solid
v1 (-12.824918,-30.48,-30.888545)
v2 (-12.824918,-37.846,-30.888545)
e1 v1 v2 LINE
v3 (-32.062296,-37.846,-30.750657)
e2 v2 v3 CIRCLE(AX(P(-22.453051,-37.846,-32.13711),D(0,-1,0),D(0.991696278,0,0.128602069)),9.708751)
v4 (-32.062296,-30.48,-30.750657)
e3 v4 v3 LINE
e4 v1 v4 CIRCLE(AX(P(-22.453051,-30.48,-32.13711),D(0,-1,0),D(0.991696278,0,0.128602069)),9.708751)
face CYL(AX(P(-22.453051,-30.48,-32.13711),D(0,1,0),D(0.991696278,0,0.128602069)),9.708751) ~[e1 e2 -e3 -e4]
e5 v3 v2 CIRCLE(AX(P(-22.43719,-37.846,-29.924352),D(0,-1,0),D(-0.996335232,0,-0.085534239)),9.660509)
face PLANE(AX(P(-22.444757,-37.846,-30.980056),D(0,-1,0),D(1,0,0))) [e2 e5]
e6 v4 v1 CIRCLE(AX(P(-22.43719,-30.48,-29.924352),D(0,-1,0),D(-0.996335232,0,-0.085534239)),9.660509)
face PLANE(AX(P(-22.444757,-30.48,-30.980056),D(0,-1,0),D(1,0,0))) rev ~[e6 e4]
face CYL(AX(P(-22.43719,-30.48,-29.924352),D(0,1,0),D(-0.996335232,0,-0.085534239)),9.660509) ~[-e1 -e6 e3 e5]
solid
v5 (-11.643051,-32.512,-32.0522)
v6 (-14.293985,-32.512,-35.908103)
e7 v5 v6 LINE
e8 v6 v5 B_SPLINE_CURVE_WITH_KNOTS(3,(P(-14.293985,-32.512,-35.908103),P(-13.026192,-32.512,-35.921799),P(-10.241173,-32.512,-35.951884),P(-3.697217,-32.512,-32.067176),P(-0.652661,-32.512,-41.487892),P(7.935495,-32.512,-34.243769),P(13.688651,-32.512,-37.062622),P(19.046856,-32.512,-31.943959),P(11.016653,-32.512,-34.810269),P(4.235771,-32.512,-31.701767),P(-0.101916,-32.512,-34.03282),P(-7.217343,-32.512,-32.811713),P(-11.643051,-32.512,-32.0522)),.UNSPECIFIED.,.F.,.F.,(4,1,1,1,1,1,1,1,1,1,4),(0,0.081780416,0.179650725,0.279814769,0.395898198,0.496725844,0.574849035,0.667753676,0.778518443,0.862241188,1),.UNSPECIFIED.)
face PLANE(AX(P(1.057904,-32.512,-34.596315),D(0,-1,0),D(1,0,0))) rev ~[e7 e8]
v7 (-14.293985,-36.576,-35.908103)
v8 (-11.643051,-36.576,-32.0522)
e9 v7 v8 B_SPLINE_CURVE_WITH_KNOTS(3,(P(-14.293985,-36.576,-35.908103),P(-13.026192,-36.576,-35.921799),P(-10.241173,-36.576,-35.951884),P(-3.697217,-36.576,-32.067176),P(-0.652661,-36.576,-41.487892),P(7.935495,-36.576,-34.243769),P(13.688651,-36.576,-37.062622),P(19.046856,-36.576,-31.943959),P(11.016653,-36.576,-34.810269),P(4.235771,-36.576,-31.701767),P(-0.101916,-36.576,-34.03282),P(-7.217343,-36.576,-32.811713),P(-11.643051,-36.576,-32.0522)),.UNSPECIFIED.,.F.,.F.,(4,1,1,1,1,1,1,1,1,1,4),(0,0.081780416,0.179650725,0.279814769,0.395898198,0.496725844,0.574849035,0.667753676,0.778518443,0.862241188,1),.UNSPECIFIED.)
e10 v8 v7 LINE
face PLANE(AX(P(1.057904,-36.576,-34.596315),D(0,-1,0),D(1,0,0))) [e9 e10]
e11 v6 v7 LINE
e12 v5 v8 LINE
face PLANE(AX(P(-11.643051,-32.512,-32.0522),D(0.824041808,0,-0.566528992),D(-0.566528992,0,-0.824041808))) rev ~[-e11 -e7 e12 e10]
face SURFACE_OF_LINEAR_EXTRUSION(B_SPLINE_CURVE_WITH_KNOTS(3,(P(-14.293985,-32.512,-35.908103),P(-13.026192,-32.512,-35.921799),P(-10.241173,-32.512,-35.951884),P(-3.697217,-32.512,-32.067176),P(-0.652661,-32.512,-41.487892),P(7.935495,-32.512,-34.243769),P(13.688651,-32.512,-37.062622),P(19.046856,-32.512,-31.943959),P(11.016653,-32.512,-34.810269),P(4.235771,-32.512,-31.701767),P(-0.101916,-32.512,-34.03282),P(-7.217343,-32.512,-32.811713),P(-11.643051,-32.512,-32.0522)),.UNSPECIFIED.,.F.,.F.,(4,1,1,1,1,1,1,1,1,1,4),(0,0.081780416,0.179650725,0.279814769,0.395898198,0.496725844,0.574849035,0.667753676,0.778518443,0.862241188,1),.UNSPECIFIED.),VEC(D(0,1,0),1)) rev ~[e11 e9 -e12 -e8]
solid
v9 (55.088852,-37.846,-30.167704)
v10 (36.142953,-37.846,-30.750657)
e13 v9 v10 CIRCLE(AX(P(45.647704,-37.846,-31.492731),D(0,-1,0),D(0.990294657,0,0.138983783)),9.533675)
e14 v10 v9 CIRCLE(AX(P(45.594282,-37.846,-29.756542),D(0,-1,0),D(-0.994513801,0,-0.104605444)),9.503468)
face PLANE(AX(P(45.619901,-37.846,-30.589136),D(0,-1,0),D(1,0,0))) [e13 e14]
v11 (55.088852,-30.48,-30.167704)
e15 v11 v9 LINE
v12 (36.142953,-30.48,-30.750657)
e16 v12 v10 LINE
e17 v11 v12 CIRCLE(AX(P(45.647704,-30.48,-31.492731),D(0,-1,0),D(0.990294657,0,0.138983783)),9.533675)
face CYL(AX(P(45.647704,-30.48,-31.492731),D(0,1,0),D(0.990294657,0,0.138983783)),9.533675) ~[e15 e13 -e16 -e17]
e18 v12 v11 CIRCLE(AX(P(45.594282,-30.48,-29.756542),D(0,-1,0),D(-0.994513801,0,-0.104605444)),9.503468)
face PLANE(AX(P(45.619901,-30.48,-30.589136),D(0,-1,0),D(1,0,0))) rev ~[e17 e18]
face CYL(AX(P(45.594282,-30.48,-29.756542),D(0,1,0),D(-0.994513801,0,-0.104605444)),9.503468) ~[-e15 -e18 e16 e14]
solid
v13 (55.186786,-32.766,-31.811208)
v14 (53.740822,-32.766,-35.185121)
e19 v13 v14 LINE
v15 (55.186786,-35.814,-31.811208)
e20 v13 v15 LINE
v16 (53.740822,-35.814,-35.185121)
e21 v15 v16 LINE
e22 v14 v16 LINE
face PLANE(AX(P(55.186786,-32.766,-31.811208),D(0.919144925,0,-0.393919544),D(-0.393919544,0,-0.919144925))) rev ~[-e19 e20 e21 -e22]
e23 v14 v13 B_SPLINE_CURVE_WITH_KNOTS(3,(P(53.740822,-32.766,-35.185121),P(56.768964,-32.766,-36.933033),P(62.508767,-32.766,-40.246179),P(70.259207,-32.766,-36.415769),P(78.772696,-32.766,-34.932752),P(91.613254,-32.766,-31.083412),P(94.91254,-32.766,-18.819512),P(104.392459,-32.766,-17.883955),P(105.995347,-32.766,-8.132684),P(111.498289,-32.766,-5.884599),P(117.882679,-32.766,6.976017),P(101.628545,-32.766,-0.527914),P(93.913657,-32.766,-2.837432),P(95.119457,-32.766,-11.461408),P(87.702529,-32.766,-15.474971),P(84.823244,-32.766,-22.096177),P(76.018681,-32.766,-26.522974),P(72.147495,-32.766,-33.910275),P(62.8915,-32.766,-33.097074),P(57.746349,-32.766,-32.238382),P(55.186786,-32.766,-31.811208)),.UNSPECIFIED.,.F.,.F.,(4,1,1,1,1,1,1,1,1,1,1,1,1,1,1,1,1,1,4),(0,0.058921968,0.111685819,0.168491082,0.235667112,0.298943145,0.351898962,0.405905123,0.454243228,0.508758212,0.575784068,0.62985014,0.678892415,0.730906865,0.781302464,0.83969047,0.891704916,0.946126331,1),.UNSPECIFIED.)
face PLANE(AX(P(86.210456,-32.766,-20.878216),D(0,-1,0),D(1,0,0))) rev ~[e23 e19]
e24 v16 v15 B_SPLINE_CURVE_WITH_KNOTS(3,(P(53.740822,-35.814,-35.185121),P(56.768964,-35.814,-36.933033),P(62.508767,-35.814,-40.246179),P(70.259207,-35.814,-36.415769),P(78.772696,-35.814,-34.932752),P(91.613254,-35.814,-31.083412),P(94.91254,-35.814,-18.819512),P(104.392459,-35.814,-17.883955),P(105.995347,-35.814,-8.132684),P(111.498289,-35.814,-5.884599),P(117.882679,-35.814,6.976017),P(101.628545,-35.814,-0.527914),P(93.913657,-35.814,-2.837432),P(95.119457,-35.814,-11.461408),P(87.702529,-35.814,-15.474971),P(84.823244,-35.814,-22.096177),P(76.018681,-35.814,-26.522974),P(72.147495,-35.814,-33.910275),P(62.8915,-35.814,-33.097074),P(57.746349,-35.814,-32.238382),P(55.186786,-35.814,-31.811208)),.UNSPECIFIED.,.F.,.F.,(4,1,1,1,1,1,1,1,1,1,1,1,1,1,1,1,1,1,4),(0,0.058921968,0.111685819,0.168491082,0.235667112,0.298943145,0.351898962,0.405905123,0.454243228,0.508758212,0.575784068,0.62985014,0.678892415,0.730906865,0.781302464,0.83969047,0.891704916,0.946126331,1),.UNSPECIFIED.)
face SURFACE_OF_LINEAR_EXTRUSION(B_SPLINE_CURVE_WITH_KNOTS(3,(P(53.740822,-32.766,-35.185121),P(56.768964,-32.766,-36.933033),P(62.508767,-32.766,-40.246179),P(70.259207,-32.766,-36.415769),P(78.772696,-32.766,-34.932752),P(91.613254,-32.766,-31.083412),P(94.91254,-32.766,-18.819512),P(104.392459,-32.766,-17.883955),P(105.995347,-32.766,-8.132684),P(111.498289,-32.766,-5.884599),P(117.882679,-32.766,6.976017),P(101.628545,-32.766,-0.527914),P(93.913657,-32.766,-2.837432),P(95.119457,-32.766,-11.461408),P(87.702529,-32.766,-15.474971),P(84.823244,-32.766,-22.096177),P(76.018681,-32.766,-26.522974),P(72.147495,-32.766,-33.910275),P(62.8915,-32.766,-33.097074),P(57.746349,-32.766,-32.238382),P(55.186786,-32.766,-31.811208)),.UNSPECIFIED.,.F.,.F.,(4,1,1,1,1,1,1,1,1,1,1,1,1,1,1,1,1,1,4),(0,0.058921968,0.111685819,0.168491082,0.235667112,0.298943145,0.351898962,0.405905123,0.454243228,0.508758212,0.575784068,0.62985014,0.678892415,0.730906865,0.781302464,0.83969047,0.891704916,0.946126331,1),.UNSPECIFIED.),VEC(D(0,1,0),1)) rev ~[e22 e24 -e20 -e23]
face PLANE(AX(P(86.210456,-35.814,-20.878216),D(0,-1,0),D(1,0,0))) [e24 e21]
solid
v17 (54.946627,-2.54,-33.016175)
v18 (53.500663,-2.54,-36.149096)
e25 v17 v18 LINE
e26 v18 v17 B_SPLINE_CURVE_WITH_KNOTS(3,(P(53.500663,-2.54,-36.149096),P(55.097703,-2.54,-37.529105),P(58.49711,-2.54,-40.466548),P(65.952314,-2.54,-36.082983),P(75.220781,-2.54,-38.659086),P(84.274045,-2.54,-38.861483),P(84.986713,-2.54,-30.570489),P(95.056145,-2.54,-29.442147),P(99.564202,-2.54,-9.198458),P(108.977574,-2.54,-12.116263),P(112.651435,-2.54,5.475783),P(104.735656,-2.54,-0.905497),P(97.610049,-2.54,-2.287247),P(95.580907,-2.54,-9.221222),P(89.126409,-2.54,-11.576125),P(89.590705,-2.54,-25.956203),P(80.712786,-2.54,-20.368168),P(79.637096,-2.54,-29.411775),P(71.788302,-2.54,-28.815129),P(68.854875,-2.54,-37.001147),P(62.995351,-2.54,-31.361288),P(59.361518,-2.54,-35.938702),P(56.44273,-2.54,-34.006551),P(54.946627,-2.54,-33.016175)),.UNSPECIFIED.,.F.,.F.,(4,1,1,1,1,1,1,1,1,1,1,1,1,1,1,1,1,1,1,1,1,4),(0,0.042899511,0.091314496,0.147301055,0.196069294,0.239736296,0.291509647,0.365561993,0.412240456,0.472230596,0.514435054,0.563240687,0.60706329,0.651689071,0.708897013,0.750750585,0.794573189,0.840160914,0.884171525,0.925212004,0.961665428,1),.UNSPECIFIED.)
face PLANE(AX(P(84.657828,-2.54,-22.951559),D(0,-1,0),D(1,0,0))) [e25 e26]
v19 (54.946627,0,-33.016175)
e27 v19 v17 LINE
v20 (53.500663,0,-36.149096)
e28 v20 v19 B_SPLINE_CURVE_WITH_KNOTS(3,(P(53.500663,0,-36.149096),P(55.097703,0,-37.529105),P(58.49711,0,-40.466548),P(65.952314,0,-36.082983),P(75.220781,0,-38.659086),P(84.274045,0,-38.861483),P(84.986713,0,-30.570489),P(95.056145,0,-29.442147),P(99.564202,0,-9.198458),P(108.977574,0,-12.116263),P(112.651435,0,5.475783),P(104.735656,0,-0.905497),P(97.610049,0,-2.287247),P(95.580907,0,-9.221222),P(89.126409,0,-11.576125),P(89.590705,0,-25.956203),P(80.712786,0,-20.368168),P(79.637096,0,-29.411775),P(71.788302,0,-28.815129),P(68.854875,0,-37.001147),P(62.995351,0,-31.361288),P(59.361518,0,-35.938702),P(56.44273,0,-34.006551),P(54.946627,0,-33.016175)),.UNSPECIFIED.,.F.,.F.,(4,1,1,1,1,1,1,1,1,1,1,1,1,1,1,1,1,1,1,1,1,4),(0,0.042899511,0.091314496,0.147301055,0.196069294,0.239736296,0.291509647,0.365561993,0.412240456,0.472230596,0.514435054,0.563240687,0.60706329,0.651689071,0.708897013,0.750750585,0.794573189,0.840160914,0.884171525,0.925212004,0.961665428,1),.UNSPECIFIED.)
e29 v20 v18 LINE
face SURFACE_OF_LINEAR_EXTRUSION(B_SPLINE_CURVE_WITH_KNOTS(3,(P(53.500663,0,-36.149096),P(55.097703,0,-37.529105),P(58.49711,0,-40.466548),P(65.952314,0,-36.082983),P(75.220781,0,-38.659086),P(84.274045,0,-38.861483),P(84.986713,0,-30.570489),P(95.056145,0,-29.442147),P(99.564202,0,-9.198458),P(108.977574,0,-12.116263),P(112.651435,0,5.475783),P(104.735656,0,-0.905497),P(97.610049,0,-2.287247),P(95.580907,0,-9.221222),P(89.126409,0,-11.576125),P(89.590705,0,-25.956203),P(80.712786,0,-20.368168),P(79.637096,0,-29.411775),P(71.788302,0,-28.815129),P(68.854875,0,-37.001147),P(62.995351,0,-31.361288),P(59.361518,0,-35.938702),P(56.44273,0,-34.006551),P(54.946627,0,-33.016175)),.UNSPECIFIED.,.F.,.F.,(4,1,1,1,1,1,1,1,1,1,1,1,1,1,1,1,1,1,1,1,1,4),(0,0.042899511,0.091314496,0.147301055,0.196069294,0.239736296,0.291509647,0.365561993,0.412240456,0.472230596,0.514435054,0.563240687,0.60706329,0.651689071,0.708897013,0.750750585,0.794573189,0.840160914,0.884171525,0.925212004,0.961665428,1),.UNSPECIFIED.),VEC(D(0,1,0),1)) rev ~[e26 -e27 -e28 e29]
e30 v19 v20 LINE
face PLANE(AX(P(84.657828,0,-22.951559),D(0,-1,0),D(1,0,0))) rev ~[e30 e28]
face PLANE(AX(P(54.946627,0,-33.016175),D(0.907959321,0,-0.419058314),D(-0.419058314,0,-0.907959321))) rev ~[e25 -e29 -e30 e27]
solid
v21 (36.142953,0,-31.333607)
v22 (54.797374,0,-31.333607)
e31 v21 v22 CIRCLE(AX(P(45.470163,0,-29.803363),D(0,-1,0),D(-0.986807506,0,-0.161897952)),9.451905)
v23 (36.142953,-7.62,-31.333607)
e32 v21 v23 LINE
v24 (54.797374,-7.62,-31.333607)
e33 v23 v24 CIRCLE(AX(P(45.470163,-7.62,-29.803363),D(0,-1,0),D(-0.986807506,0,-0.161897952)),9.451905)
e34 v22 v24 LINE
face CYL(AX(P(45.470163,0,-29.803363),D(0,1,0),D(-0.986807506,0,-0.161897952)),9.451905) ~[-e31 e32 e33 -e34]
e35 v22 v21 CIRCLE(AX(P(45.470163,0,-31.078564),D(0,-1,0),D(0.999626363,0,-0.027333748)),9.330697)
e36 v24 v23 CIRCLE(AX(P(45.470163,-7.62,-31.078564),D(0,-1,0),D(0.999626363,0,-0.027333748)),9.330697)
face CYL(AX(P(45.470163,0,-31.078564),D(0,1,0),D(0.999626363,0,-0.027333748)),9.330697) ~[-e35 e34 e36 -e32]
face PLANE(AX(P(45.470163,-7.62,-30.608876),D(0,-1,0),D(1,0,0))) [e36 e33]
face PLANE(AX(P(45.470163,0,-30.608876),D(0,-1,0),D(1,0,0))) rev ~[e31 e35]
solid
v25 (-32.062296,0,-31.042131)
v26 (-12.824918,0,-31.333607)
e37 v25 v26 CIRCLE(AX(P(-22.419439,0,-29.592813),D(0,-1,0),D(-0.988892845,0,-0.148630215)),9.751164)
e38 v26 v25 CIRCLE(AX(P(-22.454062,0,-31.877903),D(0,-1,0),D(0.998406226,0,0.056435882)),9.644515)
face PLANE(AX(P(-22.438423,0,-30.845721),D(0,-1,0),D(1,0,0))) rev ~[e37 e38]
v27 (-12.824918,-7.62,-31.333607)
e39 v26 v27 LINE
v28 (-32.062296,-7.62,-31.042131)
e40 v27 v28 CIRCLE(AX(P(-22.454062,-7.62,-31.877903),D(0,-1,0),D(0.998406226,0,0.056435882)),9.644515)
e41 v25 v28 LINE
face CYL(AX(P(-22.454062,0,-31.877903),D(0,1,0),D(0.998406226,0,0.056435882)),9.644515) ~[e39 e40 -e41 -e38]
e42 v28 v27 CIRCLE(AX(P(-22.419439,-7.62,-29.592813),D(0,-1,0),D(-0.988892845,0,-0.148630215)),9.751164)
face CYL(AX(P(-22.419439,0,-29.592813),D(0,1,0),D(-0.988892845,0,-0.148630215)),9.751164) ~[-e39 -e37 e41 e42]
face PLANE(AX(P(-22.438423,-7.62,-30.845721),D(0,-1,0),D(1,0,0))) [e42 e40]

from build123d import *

# Parameters (mm, degrees)
F3_DEPTH  = 7.62
F5_START  = 30.48
F5_DEPTH  = 7.366
F10_START = 32.512
F10_DEPTH = 4.064
F12_DEPTH = 2.54
F14_START = 32.766
F14_DEPTH = 3.048


# Not quite as in the source:
# - a feature of the source that left no trace in its solid (it failed there, or was rolled back) is left out


with BuildPart() as f3:
    # F2 (on Front) → F3 (new body)
    with BuildSketch(Plane.XZ):
        with BuildLine():
            ThreePointArc((-32.0622958243, -31.042130664), (-22.5671676861, -39.3428580499), (-12.8249181435, -31.3336066902))
            ThreePointArc((-12.8249181435, -31.3336066902), (-22.3079495267, -22.2344951449), (-32.0622958243, -31.042130664))
        make_face()
    extrude(amount=F3_DEPTH)


with BuildPart() as f3b:
    # F2 (on Front) → F3, piece 2 (new body)
    with BuildSketch(Plane.XZ):
        with BuildLine():
            ThreePointArc((54.7973737121, -31.3336066902), (45.4701632261, -21.7478670021), (36.1429527402, -31.3336066902))
            ThreePointArc((36.1429527402, -31.3336066902), (45.4701632261, -39.2552673611), (54.7973737121, -31.3336066902))
        make_face()
    extrude(amount=F3_DEPTH)


with BuildPart() as f5:
    # F4 (on Front) → F5 (new body)
    with BuildSketch(Plane.XZ.offset(F5_START)):
        with BuildLine():
            ThreePointArc((55.0888516009, -30.1677044481), (45.3544980302, -21.9635651251), (36.1429527402, -30.7506565005))
            ThreePointArc((36.1429527402, -30.7506565005), (45.8865592043, -39.2555141814), (55.0888516009, -30.1677044481))
        make_face()
    extrude(amount=F5_DEPTH)


with BuildPart() as f5b:
    # F4 (on Front) → F5, piece 2 (new body)
    with BuildSketch(Plane.XZ.offset(F5_START)):
        with BuildLine():
            ThreePointArc((-32.0622958243, -30.7506565005), (-22.50643221, -39.5846133097), (-12.8249181435, -30.8885447899))
            ThreePointArc((-12.8249181435, -30.8885447899), (-22.3834626351, -22.4286085081), (-32.0622958243, -30.7506565005))
        make_face()
    extrude(amount=F5_DEPTH)


with BuildPart() as f10:
    # F9 (on Front) → F10 (new body)
    with BuildSketch(Plane.XZ.offset(F10_START)):
        with BuildLine():
            Line((-11.6430511698, -32.0522002876), (-14.2939854413, -35.9081029892))
            add(Edge.make_bspline(
                [(-14.2939854413, -35.9081029892), (-13.0261920226, -35.9217985745), (-10.2411730767, -35.9518842841), (-3.6972167895, -32.067176477), (-0.6526611469, -41.4878923356), (7.9354953161, -34.2437685404), (13.6886514938, -37.062622216), (19.0468557998, -31.9439594198), (11.0166528887, -34.8102692246), (4.2357707624, -31.7017673976), (-0.1019163298, -34.0328198043), (-7.2173430278, -32.8117134587), (-11.6430511698, -32.0522002876)],
                knots=[0, 0, 0, 0, 0.0817804158, 0.1796507254, 0.2798147687, 0.3958981984, 0.496725844, 0.5748490351, 0.6677536759, 0.7785184426, 0.8622411876, 1, 1, 1, 1], degree=3))
        make_face()
    extrude(amount=F10_DEPTH)


with BuildPart() as f12:
    # F11 (on Front) → F12 (new body)
    with BuildSketch(Plane.XZ):
        with BuildLine():
            Line((54.9466274679, -33.0161750317), (53.5006634891, -36.1490957439))
            add(Edge.make_bspline(
                [(53.5006634891, -36.1490957439), (55.0977031822, -37.5291051807), (58.4971096899, -40.4665481762), (65.95231419, -36.0829829107), (75.220780577, -38.6590857149), (84.2740446829, -38.8614831079), (84.9867128408, -30.5704887045), (95.0561453643, -29.442146953), (99.5642019357, -9.1984577723), (108.9775737416, -12.1162628564), (112.6514347043, 5.4757828233), (104.7356559767, -0.9054966333), (97.610048844, -2.2872474322), (95.5809065439, -9.2212217621), (89.1264094725, -11.5761250504), (89.5907046652, -25.9562030628), (80.7127857094, -20.3681681585), (79.6370960355, -29.4117745628), (71.7883024771, -28.8151287093), (68.8548746122, -37.0011474599), (62.9953508407, -31.3612877239), (59.3615184452, -35.9387020137), (56.4427299675, -34.0065505462), (54.9466274679, -33.0161750317)],
                knots=[0, 0, 0, 0, 0.0428995105, 0.0913144962, 0.1473010549, 0.1960692943, 0.2397362956, 0.2915096473, 0.3655619931, 0.4122404563, 0.472230596, 0.514435054, 0.5632406868, 0.6070632899, 0.6516890708, 0.7088970126, 0.7507505853, 0.7945731891, 0.840160914, 0.8841715253, 0.9252120043, 0.9616654279, 1, 1, 1, 1], degree=3))
        make_face()
    extrude(amount=F12_DEPTH)


with BuildPart() as f14:
    # F13 (on Front) → F14 (new body)
    with BuildSketch(Plane.XZ.offset(F14_START)):
        with BuildLine():
            Line((55.1867857575, -31.8112075329), (53.7408217788, -35.1851209998))
            add(Edge.make_bspline(
                [(53.7408217788, -35.1851209998), (56.7689637452, -36.9330334514), (62.5087672191, -40.2461786318), (70.2592065444, -36.4157693672), (78.7726962572, -34.9327520704), (91.613253656, -31.0834116118), (94.9125403625, -18.8195115021), (104.3924592621, -17.8839546306), (105.9953471436, -8.1326839767), (111.4982887953, -5.8845986156), (117.8826794999, 6.9760166295), (101.6285454747, -0.5279137667), (93.9136567912, -2.8374317125), (95.1194571248, -11.4614076745), (87.702528516, -15.4749706319), (84.8232437703, -22.0961772874), (76.0186806364, -26.5229741761), (72.1474950288, -33.9102753728), (62.8915004783, -33.097073848), (57.7463494376, -32.2383819107), (55.1867857575, -31.8112075329)],
                knots=[0, 0, 0, 0, 0.0589219677, 0.1116858188, 0.1684910819, 0.2356671119, 0.2989431452, 0.3518989619, 0.405905123, 0.4542432276, 0.508758212, 0.5757840676, 0.6298501395, 0.6788924148, 0.7309068655, 0.7813024638, 0.8396904696, 0.8917049158, 0.946126331, 1, 1, 1, 1], degree=3))
        make_face()
    extrude(amount=F14_DEPTH)


solid = Compound([f3.part, f3b.part, f5.part, f5b.part, f10.part, f12.part, f14.part])
